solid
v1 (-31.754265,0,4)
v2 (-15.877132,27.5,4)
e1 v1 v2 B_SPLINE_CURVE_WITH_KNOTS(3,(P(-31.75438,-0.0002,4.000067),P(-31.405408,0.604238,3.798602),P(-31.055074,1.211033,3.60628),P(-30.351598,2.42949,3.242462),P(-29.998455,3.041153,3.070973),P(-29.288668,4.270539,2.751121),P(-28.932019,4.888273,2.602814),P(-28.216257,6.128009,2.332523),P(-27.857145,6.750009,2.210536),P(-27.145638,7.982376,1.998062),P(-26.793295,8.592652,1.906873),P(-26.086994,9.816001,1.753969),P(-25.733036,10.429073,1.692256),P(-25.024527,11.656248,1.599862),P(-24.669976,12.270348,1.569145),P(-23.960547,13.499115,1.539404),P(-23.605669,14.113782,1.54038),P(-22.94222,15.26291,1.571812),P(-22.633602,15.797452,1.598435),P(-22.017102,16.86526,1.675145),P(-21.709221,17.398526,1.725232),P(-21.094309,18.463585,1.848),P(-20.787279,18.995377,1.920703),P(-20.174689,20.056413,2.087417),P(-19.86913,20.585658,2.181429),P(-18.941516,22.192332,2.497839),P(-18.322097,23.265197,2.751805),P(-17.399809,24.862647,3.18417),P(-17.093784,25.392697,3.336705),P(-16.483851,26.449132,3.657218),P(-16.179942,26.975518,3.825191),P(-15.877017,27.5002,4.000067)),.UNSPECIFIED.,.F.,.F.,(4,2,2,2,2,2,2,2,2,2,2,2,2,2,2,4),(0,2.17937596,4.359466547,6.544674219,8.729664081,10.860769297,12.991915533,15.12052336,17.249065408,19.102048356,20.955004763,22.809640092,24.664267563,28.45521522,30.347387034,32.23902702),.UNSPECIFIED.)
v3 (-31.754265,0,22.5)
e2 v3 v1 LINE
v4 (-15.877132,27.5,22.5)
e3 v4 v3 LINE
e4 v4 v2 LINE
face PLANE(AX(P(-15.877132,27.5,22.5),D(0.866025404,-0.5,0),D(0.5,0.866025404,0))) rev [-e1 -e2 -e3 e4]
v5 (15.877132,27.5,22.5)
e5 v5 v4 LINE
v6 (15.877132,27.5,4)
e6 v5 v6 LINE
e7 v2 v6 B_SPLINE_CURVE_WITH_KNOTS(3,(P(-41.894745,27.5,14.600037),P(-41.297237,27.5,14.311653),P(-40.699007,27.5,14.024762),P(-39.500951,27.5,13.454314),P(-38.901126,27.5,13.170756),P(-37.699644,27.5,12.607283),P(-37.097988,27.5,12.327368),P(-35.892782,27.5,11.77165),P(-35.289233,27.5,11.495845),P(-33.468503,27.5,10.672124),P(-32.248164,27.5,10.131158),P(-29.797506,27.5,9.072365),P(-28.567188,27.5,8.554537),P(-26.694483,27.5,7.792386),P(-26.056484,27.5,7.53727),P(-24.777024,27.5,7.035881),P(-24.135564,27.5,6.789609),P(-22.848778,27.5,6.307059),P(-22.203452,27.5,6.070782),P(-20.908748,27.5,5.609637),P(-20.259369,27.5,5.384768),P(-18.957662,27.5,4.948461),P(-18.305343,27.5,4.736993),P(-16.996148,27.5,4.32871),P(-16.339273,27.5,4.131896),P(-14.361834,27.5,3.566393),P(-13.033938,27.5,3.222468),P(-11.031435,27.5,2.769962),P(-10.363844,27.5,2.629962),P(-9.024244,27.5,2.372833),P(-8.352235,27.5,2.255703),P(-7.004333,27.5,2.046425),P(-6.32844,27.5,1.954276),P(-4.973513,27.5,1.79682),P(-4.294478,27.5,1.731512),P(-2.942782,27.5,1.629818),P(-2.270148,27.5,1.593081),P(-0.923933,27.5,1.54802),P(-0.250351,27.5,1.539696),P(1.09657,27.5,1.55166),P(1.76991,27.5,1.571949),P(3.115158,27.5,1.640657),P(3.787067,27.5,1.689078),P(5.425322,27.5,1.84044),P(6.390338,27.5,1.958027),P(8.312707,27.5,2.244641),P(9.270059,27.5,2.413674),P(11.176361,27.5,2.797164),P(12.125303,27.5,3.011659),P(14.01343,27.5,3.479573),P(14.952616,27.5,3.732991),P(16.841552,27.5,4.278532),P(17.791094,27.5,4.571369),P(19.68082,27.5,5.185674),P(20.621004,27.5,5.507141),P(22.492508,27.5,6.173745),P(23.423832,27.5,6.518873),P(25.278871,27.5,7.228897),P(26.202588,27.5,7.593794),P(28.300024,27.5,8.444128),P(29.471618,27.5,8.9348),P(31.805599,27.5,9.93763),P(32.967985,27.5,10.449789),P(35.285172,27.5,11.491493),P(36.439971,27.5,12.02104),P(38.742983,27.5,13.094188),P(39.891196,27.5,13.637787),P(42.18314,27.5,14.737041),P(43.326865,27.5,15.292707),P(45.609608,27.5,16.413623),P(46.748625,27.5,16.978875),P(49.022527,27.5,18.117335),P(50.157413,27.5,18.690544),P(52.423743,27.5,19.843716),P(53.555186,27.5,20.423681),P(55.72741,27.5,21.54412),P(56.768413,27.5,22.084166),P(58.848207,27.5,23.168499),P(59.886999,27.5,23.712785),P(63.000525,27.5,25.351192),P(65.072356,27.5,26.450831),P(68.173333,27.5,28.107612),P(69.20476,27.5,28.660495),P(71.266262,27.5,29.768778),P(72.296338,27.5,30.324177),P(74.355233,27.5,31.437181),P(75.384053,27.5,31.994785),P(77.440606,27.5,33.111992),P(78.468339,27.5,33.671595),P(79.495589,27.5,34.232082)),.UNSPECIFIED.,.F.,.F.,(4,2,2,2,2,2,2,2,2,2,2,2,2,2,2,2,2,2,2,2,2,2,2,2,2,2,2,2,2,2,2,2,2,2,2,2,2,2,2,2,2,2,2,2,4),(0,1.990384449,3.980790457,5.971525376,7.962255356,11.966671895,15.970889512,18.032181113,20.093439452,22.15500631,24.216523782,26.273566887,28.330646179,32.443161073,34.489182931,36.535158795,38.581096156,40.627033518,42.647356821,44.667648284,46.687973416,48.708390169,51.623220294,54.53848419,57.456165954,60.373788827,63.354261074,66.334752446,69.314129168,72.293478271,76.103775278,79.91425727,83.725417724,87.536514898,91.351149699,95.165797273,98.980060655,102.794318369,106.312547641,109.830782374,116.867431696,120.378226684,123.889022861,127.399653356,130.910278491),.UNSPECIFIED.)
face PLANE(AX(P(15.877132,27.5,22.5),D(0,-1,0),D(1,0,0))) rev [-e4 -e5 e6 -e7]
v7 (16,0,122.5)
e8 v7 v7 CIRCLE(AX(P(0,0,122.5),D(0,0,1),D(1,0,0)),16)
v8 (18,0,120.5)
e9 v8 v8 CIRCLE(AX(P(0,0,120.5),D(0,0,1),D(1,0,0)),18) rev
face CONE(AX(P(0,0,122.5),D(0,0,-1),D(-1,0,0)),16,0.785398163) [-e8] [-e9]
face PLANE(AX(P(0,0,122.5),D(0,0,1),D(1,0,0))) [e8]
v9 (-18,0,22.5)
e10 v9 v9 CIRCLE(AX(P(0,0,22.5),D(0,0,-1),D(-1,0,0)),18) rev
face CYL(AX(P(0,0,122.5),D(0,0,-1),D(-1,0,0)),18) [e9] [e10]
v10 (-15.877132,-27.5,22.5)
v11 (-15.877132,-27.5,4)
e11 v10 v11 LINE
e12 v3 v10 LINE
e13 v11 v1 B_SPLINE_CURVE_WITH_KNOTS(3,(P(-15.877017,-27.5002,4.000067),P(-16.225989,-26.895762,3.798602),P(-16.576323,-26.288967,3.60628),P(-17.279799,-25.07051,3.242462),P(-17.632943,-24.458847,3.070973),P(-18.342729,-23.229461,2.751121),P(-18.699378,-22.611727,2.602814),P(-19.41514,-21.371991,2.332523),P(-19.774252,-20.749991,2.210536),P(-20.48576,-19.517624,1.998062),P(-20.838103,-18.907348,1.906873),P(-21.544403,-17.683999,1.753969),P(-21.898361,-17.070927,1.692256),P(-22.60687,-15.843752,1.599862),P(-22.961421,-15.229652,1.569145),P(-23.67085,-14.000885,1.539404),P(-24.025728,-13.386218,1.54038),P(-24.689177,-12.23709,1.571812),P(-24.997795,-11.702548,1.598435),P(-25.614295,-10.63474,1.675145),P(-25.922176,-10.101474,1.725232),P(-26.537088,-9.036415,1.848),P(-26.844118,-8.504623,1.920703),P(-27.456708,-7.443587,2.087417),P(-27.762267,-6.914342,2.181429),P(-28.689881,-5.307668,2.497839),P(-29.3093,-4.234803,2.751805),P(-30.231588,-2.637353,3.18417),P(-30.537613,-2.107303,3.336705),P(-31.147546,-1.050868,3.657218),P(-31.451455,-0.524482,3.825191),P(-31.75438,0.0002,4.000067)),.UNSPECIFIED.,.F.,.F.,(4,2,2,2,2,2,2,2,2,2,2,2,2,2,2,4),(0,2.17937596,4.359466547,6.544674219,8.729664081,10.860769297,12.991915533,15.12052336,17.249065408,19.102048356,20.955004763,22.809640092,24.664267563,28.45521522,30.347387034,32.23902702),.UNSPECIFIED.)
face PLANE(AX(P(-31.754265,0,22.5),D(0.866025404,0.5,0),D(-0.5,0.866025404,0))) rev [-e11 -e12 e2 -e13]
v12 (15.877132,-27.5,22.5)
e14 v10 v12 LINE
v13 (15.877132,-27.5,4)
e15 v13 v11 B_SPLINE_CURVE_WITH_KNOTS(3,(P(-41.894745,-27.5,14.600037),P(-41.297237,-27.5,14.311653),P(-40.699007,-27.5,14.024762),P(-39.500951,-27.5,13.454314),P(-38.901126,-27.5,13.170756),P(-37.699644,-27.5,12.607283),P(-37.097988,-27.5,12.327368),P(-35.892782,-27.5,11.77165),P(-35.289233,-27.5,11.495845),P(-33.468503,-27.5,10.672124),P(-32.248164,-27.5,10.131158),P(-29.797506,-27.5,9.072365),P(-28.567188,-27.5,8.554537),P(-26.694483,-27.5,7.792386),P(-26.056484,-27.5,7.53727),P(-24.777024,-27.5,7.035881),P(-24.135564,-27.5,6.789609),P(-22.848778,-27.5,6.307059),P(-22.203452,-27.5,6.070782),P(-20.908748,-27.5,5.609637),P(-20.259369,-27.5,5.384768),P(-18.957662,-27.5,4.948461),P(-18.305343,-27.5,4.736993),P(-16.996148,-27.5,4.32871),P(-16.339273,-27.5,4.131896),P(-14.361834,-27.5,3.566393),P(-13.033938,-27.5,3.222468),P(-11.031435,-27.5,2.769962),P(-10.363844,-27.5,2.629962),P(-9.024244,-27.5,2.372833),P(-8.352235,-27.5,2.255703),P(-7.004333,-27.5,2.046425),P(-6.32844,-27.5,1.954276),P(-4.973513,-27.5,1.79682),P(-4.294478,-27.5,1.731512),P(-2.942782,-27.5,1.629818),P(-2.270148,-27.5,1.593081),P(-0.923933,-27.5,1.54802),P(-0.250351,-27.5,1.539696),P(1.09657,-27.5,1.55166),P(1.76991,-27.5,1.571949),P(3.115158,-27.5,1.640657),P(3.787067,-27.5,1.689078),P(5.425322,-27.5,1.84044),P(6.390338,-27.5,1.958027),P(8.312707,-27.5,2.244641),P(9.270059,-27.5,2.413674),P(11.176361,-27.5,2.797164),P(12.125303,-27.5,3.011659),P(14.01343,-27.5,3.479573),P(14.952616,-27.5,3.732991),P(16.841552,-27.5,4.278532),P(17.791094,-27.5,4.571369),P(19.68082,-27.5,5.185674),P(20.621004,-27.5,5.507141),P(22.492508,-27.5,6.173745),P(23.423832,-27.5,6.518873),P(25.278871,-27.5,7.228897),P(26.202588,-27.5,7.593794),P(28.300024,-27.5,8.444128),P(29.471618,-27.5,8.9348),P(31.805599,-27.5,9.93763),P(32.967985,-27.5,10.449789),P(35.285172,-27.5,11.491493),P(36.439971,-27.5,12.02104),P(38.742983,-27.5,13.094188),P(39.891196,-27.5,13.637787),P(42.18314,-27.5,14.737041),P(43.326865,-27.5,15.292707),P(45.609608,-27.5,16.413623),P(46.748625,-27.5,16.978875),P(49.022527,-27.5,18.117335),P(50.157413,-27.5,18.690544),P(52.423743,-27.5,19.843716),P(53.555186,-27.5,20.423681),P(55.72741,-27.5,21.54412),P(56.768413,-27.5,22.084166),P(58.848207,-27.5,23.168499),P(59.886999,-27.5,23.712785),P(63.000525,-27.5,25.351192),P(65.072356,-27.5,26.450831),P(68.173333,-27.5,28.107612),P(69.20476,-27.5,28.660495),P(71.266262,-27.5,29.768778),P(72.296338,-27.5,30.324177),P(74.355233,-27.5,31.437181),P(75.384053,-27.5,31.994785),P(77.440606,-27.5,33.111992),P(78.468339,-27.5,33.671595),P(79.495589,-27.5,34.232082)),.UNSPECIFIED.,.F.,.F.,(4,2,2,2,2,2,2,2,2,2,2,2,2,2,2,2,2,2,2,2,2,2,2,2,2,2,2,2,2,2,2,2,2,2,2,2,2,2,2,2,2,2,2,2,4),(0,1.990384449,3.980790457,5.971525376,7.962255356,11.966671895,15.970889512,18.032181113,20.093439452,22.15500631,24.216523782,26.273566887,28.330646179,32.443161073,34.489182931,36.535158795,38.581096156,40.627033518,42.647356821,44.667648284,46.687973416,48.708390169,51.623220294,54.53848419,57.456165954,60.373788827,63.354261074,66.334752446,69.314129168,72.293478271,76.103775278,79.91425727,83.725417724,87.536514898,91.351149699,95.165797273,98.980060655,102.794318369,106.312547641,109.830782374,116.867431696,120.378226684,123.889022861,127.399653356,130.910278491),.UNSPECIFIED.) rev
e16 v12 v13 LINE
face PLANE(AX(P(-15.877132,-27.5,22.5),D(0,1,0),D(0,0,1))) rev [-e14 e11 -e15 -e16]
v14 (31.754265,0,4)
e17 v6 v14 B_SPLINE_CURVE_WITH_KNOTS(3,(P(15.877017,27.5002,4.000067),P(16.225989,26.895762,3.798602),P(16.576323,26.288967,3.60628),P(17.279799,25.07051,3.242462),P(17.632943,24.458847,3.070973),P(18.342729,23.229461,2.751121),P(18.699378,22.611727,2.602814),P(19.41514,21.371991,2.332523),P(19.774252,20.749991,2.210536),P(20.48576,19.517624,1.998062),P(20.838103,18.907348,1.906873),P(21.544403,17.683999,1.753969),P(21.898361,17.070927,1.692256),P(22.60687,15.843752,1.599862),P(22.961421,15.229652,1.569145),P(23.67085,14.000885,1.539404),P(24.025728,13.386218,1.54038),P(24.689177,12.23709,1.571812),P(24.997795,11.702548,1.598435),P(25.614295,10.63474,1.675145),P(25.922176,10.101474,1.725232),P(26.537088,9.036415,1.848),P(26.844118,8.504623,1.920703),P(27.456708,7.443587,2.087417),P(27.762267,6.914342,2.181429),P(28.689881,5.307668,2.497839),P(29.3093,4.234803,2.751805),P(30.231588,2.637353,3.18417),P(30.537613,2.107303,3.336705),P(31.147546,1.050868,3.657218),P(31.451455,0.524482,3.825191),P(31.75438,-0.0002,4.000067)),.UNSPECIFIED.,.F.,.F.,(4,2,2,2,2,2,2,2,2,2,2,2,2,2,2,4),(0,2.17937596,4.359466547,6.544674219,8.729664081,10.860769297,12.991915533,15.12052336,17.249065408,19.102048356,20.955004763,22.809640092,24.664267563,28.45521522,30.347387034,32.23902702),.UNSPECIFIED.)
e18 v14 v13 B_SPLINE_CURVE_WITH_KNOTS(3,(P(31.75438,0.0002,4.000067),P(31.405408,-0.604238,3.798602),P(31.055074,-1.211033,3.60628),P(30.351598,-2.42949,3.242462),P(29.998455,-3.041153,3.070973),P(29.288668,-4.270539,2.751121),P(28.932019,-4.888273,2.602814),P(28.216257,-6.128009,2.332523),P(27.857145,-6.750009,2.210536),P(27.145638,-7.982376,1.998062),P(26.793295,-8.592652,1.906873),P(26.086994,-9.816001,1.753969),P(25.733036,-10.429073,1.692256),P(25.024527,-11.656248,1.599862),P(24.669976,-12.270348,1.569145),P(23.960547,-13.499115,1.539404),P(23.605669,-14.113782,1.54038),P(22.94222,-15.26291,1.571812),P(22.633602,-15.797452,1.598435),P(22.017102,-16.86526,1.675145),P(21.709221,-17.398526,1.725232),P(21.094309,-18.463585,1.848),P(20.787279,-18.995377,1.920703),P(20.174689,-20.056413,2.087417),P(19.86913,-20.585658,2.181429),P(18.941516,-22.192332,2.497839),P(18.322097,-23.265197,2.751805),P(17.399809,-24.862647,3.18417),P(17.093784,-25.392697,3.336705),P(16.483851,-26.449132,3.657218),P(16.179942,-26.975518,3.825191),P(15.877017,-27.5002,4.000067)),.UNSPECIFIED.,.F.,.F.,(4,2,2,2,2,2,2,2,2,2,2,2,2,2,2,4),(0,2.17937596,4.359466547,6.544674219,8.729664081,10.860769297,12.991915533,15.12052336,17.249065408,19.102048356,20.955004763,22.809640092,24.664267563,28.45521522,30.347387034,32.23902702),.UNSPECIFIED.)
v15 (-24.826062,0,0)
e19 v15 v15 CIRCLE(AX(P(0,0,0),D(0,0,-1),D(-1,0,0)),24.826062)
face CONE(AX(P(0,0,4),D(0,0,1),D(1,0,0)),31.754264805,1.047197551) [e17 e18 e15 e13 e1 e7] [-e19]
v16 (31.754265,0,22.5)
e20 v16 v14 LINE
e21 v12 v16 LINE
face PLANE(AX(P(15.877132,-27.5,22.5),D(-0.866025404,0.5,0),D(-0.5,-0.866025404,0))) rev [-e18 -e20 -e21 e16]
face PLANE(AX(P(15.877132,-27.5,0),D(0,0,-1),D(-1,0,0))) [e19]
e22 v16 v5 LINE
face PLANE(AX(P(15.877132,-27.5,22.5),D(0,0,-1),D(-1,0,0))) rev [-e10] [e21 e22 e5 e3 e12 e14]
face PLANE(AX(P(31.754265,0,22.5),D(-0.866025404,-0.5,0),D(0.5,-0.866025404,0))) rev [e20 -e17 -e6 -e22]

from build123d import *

# Parameters (mm, degrees)
EXTRUDE_1_DEPTH = 22.5
SKETCH_2_R      = 18
EXTRUDE_2_DEPTH = 100
CHAMFER_1_SIZE  = 2


# Read off the part's stored shape, not the designer's step: 切除-旋转-薄壁1
with BuildPart() as part:
    # 草图1 → 拉伸1 (new body)
    with BuildSketch(Plane.XY):
        Polygon((31.754264805, 0), (15.877132403, 27.5), (-15.877132403, 27.5), (-31.754264805, 0), (-15.877132403, -27.5), (15.877132403, -27.5), align=None)
    extrude(amount=EXTRUDE_1_DEPTH)

    # 草图2 → 拉伸2 (add)
    with BuildSketch(Plane.XY.offset(22.5)):
        with Locations(Location((0, 0, 0), (0, 0, 180))):
            Circle(SKETCH_2_R)
    extrude(amount=EXTRUDE_2_DEPTH)

    # 切除-旋转-薄壁1 outline → 切除-旋转-薄壁1 (revolve, cut)
    with BuildSketch(Plane.XZ):
        Polygon((31.754264936, 4.000000075), (24.826061575, 0), (31.754264936, 0), align=None)
    revolve(axis=Axis((0, 0, 0), (0, 0, 1)), mode=Mode.SUBTRACT)

    # 倒角1
    chamfer_1_edges = [part.edges().sort_by_distance(p)[0] for p in [
        (18, 0, 122.5),
    ]]
    chamfer(chamfer_1_edges, length=CHAMFER_1_SIZE)


solid = part.part
